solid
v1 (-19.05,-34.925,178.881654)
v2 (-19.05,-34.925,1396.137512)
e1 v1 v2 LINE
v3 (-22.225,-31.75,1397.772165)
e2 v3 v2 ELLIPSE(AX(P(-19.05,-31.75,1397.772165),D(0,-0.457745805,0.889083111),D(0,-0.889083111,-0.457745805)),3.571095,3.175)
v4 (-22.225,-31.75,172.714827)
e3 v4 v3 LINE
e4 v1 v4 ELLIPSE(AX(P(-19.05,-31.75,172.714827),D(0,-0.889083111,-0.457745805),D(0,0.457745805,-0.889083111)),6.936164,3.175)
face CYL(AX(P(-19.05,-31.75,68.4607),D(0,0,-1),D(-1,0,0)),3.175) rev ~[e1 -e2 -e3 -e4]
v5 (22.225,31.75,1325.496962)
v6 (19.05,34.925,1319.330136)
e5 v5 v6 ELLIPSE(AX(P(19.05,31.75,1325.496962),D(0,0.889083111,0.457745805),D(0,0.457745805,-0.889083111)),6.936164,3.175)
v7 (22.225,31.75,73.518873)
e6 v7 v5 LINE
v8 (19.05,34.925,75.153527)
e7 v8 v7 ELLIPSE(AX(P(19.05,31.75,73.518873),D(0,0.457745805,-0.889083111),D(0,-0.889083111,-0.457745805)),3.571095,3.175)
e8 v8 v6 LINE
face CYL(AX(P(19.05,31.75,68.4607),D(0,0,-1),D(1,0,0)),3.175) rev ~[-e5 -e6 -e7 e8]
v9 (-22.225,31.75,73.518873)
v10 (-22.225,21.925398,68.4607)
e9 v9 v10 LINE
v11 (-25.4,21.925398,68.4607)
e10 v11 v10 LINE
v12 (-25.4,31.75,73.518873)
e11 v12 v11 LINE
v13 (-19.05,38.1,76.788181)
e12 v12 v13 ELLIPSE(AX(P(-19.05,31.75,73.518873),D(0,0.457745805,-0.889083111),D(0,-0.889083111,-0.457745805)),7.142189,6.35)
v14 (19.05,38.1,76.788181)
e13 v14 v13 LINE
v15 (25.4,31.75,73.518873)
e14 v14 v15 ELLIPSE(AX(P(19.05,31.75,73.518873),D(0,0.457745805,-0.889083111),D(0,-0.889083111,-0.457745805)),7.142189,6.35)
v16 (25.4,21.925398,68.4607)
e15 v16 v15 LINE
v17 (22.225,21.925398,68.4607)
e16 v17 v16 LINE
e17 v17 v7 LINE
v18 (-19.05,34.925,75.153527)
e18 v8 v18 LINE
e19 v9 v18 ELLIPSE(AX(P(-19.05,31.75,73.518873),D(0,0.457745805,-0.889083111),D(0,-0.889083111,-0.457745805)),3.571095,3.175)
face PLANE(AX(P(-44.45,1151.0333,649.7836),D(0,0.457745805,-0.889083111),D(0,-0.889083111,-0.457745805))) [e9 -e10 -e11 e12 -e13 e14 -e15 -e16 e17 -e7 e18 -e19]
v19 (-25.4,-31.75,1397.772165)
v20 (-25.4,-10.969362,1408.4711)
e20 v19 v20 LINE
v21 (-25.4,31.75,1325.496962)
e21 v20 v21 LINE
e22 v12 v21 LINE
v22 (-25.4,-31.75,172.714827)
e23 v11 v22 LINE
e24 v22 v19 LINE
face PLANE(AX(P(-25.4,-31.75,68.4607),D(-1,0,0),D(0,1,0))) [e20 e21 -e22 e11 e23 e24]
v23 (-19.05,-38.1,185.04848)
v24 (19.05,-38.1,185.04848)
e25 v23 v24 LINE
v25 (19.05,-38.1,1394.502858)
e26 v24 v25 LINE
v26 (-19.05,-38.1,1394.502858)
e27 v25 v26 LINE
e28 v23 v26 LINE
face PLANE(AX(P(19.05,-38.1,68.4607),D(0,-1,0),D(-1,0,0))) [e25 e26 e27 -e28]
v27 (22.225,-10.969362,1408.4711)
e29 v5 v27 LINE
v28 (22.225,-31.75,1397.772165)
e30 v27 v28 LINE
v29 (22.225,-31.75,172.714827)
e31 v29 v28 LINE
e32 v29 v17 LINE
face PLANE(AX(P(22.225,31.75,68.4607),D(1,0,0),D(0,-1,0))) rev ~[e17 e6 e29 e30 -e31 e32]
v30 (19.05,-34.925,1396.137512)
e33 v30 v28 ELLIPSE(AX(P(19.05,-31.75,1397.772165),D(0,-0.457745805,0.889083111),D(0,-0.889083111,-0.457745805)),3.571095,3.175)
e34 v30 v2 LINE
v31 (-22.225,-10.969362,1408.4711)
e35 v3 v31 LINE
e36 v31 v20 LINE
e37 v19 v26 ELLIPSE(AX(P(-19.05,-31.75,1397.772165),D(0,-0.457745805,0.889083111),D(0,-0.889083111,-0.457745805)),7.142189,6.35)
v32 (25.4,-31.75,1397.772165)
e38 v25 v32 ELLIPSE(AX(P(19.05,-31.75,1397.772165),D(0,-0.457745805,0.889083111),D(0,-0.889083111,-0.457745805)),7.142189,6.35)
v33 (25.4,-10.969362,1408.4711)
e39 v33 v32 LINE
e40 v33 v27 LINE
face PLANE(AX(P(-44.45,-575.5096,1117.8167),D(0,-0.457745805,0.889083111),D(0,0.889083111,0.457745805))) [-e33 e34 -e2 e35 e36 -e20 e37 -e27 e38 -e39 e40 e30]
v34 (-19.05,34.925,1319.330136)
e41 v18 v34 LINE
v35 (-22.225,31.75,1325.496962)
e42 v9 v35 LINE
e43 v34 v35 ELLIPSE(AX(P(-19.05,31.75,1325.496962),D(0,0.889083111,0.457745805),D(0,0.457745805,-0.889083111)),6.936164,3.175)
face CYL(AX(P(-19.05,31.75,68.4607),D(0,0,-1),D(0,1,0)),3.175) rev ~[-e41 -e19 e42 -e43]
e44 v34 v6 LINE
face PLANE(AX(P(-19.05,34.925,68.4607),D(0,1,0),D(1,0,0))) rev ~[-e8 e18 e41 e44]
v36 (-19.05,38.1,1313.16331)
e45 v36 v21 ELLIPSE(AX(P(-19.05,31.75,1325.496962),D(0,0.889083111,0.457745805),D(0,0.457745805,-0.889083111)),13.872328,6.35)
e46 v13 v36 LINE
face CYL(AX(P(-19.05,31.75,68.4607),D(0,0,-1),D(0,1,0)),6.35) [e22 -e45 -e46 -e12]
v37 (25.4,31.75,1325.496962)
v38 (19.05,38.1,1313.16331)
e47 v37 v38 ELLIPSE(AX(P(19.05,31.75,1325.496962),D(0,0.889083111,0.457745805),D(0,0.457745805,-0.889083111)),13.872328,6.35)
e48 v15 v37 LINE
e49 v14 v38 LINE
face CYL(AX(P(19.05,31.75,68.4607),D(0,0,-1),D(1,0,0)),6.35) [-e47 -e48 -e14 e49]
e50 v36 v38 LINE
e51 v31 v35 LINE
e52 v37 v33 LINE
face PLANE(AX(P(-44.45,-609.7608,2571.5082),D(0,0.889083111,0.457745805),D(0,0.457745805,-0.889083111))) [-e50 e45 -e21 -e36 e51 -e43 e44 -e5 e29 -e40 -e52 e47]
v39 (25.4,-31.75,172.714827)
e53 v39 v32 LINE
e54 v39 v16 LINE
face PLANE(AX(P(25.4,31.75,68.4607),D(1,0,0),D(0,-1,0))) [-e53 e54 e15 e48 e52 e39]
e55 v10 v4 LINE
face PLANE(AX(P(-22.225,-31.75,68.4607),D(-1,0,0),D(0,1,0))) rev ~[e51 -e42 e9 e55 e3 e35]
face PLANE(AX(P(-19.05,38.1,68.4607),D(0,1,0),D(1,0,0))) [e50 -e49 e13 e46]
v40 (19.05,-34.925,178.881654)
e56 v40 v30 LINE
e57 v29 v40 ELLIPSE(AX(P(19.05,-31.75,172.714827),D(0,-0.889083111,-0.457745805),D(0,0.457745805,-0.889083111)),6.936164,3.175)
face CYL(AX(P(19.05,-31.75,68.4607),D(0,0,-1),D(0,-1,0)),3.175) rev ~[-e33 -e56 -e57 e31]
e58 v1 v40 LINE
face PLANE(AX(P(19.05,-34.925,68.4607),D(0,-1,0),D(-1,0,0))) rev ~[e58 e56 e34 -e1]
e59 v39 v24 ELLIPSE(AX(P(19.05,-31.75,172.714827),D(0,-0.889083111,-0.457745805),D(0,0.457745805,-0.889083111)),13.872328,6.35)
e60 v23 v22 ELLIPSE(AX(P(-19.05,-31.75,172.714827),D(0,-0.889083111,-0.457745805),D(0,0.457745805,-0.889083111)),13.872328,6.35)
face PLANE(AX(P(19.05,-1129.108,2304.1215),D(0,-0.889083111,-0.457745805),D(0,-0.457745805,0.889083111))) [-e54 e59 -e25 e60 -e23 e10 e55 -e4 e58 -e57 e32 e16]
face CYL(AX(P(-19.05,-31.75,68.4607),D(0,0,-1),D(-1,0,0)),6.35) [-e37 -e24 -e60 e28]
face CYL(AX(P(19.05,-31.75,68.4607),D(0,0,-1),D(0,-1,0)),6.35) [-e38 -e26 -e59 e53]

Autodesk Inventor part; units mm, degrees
ref_plane "Start Plane" through (0, 0, 68.4607) normal (0, 0, 1) x (1, 0, 0)
ref_plane "End Plane" through (0, 0, 1408.471) normal (0, 0, 1) x (1, 0, 0)
sketch "Sketch" plane through (0, 0, 0) normal (0, 0, 1) x (1, 0, 0)
  line L0 (-25.4, -31.75) -> (-25.4, 31.75)
  line L1 (-19.05, 38.1) -> (19.05, 38.1)
  line L2 (25.4, 31.75) -> (25.4, -31.75)
  line L3 (19.05, -38.1) -> (-19.05, -38.1)
  arc A0 (-25.4, -31.75) -> (-19.05, -38.1) centre (-19.05, -31.75) ccw
  arc A1 (-19.05, 38.1) -> (-25.4, 31.75) centre (-19.05, 31.75) ccw
  arc A2 (25.4, 31.75) -> (19.05, 38.1) centre (19.05, 31.75) ccw
  arc A3 (19.05, -38.1) -> (25.4, -31.75) centre (19.05, -31.75) ccw
  arc A4 (-19.05, 34.925) -> (-22.225, 31.75) centre (-19.05, 31.75) ccw
  line L4 (-19.05, 34.925) -> (19.05, 34.925)
  arc A5 (22.225, 31.75) -> (19.05, 34.925) centre (19.05, 31.75) ccw
  line L5 (22.225, 31.75) -> (22.225, -31.75)
  arc A6 (19.05, -34.925) -> (22.225, -31.75) centre (19.05, -31.75) ccw
  line L6 (19.05, -34.925) -> (-19.05, -34.925)
  arc A7 (-22.225, -31.75) -> (-19.05, -34.925) centre (-19.05, -31.75) ccw
  line L7 (-22.225, -31.75) -> (-22.225, 31.75)
  line L8 (0, 55.1812) -> (0, -55.1812) construction
  line L9 (-37.4012, 0) -> (37.4012, 0) construction
  dimension "d10" = 76.2
  dimension "d11" = 50.8
  dimension "d12" = 3.175
  dimension "d15" = 38.1
  dimension "d16" = 25.4
  dimension "d17" = 6.35
extrude "Body" add sketch "Sketch" along normal up to surface (1340.0104 mm away) from surface at 68.4607
sketch "Sketch3" plane through (0, 0, 0) normal (0, 0, 1) x (1, 0, 0)
  line L0 (0, 0) -> (10, 0)
ref_plane "Work Plane3" through (0, 0, 0) normal (0, -1, 0) x (1, 0, 0)
ref_plane "Work Plane8" through (19.05, -1129.108, 2304.1215) normal (0, -0.8890831, -0.4577458) x (1, 0, 0)
split "Split5" plane through (19.05, -1129.108, 2304.1215) removes the side toward (0, -0.8890831, -0.4577458)
ref_plane "Work Plane9" through (-44.45, 1151.0333, 649.7836) normal (0, 0.4577458, -0.8890831) x (1, 0, 0)
split "Split6" plane through (-44.45, 1151.0333, 649.7836) removes the side toward (0, 0.4577458, -0.8890831)
ref_plane "Work Plane10" through (-44.45, -609.7608, 2571.5082) normal (0, 0.8890831, 0.4577458) x (1, 0, 0)
split "Split7" plane through (-44.45, -609.7608, 2571.5082) removes the side toward (0, 0.8890831, 0.4577458)
ref_plane "Work Plane11" through (-44.45, -575.5096, 1117.8167) normal (0, -0.4577458, 0.8890831) x (1, 0, 0)
split "Split8" plane through (-44.45, -575.5096, 1117.8167) removes the side toward (0, -0.4577458, 0.8890831)
sketch "Sketch4" plane through (0, 0, 0) normal (0, -1, 0) x (1, 0, 0)
  line L0 (-2, 68.4607) -> (12, 68.4607) projected
  line L1 (-2, 1408.471) -> (12, 1408.471) projected
  dimension "d19" = 1340.0104
equation "\"d10\" = G_H"
equation "\"d11\" = G_W"
equation "\"d12\" = G_T"
equation "\"d15\" = 0.5 * d10"
equation "\"d16\" = 0.5 * d11"
equation "\"d17\" = G_IR"
equation "\"d3\" = G_L"
equation "\"G_W\" = 50.8"
equation "\"G_H\" = 76.2"
equation "\"G_T\" = 3.175"
equation "\"G_IR\" = 6.35"
equation "\"G_L\" = d19"
equation "\"G_OFFSET_START\" = -68.46066"
equation "\"G_OFFSET_END\" = -34.25121"
equation "\"d13\" = -G_OFFSET_START"
equation "\"d14\" = G_OFFSET_END + B_L"
equation "\"B_L\" = 1442.72224"
properties part number "AISC - 3 x 2 x 1/8 - 52.756" material "Steel, Mild"
